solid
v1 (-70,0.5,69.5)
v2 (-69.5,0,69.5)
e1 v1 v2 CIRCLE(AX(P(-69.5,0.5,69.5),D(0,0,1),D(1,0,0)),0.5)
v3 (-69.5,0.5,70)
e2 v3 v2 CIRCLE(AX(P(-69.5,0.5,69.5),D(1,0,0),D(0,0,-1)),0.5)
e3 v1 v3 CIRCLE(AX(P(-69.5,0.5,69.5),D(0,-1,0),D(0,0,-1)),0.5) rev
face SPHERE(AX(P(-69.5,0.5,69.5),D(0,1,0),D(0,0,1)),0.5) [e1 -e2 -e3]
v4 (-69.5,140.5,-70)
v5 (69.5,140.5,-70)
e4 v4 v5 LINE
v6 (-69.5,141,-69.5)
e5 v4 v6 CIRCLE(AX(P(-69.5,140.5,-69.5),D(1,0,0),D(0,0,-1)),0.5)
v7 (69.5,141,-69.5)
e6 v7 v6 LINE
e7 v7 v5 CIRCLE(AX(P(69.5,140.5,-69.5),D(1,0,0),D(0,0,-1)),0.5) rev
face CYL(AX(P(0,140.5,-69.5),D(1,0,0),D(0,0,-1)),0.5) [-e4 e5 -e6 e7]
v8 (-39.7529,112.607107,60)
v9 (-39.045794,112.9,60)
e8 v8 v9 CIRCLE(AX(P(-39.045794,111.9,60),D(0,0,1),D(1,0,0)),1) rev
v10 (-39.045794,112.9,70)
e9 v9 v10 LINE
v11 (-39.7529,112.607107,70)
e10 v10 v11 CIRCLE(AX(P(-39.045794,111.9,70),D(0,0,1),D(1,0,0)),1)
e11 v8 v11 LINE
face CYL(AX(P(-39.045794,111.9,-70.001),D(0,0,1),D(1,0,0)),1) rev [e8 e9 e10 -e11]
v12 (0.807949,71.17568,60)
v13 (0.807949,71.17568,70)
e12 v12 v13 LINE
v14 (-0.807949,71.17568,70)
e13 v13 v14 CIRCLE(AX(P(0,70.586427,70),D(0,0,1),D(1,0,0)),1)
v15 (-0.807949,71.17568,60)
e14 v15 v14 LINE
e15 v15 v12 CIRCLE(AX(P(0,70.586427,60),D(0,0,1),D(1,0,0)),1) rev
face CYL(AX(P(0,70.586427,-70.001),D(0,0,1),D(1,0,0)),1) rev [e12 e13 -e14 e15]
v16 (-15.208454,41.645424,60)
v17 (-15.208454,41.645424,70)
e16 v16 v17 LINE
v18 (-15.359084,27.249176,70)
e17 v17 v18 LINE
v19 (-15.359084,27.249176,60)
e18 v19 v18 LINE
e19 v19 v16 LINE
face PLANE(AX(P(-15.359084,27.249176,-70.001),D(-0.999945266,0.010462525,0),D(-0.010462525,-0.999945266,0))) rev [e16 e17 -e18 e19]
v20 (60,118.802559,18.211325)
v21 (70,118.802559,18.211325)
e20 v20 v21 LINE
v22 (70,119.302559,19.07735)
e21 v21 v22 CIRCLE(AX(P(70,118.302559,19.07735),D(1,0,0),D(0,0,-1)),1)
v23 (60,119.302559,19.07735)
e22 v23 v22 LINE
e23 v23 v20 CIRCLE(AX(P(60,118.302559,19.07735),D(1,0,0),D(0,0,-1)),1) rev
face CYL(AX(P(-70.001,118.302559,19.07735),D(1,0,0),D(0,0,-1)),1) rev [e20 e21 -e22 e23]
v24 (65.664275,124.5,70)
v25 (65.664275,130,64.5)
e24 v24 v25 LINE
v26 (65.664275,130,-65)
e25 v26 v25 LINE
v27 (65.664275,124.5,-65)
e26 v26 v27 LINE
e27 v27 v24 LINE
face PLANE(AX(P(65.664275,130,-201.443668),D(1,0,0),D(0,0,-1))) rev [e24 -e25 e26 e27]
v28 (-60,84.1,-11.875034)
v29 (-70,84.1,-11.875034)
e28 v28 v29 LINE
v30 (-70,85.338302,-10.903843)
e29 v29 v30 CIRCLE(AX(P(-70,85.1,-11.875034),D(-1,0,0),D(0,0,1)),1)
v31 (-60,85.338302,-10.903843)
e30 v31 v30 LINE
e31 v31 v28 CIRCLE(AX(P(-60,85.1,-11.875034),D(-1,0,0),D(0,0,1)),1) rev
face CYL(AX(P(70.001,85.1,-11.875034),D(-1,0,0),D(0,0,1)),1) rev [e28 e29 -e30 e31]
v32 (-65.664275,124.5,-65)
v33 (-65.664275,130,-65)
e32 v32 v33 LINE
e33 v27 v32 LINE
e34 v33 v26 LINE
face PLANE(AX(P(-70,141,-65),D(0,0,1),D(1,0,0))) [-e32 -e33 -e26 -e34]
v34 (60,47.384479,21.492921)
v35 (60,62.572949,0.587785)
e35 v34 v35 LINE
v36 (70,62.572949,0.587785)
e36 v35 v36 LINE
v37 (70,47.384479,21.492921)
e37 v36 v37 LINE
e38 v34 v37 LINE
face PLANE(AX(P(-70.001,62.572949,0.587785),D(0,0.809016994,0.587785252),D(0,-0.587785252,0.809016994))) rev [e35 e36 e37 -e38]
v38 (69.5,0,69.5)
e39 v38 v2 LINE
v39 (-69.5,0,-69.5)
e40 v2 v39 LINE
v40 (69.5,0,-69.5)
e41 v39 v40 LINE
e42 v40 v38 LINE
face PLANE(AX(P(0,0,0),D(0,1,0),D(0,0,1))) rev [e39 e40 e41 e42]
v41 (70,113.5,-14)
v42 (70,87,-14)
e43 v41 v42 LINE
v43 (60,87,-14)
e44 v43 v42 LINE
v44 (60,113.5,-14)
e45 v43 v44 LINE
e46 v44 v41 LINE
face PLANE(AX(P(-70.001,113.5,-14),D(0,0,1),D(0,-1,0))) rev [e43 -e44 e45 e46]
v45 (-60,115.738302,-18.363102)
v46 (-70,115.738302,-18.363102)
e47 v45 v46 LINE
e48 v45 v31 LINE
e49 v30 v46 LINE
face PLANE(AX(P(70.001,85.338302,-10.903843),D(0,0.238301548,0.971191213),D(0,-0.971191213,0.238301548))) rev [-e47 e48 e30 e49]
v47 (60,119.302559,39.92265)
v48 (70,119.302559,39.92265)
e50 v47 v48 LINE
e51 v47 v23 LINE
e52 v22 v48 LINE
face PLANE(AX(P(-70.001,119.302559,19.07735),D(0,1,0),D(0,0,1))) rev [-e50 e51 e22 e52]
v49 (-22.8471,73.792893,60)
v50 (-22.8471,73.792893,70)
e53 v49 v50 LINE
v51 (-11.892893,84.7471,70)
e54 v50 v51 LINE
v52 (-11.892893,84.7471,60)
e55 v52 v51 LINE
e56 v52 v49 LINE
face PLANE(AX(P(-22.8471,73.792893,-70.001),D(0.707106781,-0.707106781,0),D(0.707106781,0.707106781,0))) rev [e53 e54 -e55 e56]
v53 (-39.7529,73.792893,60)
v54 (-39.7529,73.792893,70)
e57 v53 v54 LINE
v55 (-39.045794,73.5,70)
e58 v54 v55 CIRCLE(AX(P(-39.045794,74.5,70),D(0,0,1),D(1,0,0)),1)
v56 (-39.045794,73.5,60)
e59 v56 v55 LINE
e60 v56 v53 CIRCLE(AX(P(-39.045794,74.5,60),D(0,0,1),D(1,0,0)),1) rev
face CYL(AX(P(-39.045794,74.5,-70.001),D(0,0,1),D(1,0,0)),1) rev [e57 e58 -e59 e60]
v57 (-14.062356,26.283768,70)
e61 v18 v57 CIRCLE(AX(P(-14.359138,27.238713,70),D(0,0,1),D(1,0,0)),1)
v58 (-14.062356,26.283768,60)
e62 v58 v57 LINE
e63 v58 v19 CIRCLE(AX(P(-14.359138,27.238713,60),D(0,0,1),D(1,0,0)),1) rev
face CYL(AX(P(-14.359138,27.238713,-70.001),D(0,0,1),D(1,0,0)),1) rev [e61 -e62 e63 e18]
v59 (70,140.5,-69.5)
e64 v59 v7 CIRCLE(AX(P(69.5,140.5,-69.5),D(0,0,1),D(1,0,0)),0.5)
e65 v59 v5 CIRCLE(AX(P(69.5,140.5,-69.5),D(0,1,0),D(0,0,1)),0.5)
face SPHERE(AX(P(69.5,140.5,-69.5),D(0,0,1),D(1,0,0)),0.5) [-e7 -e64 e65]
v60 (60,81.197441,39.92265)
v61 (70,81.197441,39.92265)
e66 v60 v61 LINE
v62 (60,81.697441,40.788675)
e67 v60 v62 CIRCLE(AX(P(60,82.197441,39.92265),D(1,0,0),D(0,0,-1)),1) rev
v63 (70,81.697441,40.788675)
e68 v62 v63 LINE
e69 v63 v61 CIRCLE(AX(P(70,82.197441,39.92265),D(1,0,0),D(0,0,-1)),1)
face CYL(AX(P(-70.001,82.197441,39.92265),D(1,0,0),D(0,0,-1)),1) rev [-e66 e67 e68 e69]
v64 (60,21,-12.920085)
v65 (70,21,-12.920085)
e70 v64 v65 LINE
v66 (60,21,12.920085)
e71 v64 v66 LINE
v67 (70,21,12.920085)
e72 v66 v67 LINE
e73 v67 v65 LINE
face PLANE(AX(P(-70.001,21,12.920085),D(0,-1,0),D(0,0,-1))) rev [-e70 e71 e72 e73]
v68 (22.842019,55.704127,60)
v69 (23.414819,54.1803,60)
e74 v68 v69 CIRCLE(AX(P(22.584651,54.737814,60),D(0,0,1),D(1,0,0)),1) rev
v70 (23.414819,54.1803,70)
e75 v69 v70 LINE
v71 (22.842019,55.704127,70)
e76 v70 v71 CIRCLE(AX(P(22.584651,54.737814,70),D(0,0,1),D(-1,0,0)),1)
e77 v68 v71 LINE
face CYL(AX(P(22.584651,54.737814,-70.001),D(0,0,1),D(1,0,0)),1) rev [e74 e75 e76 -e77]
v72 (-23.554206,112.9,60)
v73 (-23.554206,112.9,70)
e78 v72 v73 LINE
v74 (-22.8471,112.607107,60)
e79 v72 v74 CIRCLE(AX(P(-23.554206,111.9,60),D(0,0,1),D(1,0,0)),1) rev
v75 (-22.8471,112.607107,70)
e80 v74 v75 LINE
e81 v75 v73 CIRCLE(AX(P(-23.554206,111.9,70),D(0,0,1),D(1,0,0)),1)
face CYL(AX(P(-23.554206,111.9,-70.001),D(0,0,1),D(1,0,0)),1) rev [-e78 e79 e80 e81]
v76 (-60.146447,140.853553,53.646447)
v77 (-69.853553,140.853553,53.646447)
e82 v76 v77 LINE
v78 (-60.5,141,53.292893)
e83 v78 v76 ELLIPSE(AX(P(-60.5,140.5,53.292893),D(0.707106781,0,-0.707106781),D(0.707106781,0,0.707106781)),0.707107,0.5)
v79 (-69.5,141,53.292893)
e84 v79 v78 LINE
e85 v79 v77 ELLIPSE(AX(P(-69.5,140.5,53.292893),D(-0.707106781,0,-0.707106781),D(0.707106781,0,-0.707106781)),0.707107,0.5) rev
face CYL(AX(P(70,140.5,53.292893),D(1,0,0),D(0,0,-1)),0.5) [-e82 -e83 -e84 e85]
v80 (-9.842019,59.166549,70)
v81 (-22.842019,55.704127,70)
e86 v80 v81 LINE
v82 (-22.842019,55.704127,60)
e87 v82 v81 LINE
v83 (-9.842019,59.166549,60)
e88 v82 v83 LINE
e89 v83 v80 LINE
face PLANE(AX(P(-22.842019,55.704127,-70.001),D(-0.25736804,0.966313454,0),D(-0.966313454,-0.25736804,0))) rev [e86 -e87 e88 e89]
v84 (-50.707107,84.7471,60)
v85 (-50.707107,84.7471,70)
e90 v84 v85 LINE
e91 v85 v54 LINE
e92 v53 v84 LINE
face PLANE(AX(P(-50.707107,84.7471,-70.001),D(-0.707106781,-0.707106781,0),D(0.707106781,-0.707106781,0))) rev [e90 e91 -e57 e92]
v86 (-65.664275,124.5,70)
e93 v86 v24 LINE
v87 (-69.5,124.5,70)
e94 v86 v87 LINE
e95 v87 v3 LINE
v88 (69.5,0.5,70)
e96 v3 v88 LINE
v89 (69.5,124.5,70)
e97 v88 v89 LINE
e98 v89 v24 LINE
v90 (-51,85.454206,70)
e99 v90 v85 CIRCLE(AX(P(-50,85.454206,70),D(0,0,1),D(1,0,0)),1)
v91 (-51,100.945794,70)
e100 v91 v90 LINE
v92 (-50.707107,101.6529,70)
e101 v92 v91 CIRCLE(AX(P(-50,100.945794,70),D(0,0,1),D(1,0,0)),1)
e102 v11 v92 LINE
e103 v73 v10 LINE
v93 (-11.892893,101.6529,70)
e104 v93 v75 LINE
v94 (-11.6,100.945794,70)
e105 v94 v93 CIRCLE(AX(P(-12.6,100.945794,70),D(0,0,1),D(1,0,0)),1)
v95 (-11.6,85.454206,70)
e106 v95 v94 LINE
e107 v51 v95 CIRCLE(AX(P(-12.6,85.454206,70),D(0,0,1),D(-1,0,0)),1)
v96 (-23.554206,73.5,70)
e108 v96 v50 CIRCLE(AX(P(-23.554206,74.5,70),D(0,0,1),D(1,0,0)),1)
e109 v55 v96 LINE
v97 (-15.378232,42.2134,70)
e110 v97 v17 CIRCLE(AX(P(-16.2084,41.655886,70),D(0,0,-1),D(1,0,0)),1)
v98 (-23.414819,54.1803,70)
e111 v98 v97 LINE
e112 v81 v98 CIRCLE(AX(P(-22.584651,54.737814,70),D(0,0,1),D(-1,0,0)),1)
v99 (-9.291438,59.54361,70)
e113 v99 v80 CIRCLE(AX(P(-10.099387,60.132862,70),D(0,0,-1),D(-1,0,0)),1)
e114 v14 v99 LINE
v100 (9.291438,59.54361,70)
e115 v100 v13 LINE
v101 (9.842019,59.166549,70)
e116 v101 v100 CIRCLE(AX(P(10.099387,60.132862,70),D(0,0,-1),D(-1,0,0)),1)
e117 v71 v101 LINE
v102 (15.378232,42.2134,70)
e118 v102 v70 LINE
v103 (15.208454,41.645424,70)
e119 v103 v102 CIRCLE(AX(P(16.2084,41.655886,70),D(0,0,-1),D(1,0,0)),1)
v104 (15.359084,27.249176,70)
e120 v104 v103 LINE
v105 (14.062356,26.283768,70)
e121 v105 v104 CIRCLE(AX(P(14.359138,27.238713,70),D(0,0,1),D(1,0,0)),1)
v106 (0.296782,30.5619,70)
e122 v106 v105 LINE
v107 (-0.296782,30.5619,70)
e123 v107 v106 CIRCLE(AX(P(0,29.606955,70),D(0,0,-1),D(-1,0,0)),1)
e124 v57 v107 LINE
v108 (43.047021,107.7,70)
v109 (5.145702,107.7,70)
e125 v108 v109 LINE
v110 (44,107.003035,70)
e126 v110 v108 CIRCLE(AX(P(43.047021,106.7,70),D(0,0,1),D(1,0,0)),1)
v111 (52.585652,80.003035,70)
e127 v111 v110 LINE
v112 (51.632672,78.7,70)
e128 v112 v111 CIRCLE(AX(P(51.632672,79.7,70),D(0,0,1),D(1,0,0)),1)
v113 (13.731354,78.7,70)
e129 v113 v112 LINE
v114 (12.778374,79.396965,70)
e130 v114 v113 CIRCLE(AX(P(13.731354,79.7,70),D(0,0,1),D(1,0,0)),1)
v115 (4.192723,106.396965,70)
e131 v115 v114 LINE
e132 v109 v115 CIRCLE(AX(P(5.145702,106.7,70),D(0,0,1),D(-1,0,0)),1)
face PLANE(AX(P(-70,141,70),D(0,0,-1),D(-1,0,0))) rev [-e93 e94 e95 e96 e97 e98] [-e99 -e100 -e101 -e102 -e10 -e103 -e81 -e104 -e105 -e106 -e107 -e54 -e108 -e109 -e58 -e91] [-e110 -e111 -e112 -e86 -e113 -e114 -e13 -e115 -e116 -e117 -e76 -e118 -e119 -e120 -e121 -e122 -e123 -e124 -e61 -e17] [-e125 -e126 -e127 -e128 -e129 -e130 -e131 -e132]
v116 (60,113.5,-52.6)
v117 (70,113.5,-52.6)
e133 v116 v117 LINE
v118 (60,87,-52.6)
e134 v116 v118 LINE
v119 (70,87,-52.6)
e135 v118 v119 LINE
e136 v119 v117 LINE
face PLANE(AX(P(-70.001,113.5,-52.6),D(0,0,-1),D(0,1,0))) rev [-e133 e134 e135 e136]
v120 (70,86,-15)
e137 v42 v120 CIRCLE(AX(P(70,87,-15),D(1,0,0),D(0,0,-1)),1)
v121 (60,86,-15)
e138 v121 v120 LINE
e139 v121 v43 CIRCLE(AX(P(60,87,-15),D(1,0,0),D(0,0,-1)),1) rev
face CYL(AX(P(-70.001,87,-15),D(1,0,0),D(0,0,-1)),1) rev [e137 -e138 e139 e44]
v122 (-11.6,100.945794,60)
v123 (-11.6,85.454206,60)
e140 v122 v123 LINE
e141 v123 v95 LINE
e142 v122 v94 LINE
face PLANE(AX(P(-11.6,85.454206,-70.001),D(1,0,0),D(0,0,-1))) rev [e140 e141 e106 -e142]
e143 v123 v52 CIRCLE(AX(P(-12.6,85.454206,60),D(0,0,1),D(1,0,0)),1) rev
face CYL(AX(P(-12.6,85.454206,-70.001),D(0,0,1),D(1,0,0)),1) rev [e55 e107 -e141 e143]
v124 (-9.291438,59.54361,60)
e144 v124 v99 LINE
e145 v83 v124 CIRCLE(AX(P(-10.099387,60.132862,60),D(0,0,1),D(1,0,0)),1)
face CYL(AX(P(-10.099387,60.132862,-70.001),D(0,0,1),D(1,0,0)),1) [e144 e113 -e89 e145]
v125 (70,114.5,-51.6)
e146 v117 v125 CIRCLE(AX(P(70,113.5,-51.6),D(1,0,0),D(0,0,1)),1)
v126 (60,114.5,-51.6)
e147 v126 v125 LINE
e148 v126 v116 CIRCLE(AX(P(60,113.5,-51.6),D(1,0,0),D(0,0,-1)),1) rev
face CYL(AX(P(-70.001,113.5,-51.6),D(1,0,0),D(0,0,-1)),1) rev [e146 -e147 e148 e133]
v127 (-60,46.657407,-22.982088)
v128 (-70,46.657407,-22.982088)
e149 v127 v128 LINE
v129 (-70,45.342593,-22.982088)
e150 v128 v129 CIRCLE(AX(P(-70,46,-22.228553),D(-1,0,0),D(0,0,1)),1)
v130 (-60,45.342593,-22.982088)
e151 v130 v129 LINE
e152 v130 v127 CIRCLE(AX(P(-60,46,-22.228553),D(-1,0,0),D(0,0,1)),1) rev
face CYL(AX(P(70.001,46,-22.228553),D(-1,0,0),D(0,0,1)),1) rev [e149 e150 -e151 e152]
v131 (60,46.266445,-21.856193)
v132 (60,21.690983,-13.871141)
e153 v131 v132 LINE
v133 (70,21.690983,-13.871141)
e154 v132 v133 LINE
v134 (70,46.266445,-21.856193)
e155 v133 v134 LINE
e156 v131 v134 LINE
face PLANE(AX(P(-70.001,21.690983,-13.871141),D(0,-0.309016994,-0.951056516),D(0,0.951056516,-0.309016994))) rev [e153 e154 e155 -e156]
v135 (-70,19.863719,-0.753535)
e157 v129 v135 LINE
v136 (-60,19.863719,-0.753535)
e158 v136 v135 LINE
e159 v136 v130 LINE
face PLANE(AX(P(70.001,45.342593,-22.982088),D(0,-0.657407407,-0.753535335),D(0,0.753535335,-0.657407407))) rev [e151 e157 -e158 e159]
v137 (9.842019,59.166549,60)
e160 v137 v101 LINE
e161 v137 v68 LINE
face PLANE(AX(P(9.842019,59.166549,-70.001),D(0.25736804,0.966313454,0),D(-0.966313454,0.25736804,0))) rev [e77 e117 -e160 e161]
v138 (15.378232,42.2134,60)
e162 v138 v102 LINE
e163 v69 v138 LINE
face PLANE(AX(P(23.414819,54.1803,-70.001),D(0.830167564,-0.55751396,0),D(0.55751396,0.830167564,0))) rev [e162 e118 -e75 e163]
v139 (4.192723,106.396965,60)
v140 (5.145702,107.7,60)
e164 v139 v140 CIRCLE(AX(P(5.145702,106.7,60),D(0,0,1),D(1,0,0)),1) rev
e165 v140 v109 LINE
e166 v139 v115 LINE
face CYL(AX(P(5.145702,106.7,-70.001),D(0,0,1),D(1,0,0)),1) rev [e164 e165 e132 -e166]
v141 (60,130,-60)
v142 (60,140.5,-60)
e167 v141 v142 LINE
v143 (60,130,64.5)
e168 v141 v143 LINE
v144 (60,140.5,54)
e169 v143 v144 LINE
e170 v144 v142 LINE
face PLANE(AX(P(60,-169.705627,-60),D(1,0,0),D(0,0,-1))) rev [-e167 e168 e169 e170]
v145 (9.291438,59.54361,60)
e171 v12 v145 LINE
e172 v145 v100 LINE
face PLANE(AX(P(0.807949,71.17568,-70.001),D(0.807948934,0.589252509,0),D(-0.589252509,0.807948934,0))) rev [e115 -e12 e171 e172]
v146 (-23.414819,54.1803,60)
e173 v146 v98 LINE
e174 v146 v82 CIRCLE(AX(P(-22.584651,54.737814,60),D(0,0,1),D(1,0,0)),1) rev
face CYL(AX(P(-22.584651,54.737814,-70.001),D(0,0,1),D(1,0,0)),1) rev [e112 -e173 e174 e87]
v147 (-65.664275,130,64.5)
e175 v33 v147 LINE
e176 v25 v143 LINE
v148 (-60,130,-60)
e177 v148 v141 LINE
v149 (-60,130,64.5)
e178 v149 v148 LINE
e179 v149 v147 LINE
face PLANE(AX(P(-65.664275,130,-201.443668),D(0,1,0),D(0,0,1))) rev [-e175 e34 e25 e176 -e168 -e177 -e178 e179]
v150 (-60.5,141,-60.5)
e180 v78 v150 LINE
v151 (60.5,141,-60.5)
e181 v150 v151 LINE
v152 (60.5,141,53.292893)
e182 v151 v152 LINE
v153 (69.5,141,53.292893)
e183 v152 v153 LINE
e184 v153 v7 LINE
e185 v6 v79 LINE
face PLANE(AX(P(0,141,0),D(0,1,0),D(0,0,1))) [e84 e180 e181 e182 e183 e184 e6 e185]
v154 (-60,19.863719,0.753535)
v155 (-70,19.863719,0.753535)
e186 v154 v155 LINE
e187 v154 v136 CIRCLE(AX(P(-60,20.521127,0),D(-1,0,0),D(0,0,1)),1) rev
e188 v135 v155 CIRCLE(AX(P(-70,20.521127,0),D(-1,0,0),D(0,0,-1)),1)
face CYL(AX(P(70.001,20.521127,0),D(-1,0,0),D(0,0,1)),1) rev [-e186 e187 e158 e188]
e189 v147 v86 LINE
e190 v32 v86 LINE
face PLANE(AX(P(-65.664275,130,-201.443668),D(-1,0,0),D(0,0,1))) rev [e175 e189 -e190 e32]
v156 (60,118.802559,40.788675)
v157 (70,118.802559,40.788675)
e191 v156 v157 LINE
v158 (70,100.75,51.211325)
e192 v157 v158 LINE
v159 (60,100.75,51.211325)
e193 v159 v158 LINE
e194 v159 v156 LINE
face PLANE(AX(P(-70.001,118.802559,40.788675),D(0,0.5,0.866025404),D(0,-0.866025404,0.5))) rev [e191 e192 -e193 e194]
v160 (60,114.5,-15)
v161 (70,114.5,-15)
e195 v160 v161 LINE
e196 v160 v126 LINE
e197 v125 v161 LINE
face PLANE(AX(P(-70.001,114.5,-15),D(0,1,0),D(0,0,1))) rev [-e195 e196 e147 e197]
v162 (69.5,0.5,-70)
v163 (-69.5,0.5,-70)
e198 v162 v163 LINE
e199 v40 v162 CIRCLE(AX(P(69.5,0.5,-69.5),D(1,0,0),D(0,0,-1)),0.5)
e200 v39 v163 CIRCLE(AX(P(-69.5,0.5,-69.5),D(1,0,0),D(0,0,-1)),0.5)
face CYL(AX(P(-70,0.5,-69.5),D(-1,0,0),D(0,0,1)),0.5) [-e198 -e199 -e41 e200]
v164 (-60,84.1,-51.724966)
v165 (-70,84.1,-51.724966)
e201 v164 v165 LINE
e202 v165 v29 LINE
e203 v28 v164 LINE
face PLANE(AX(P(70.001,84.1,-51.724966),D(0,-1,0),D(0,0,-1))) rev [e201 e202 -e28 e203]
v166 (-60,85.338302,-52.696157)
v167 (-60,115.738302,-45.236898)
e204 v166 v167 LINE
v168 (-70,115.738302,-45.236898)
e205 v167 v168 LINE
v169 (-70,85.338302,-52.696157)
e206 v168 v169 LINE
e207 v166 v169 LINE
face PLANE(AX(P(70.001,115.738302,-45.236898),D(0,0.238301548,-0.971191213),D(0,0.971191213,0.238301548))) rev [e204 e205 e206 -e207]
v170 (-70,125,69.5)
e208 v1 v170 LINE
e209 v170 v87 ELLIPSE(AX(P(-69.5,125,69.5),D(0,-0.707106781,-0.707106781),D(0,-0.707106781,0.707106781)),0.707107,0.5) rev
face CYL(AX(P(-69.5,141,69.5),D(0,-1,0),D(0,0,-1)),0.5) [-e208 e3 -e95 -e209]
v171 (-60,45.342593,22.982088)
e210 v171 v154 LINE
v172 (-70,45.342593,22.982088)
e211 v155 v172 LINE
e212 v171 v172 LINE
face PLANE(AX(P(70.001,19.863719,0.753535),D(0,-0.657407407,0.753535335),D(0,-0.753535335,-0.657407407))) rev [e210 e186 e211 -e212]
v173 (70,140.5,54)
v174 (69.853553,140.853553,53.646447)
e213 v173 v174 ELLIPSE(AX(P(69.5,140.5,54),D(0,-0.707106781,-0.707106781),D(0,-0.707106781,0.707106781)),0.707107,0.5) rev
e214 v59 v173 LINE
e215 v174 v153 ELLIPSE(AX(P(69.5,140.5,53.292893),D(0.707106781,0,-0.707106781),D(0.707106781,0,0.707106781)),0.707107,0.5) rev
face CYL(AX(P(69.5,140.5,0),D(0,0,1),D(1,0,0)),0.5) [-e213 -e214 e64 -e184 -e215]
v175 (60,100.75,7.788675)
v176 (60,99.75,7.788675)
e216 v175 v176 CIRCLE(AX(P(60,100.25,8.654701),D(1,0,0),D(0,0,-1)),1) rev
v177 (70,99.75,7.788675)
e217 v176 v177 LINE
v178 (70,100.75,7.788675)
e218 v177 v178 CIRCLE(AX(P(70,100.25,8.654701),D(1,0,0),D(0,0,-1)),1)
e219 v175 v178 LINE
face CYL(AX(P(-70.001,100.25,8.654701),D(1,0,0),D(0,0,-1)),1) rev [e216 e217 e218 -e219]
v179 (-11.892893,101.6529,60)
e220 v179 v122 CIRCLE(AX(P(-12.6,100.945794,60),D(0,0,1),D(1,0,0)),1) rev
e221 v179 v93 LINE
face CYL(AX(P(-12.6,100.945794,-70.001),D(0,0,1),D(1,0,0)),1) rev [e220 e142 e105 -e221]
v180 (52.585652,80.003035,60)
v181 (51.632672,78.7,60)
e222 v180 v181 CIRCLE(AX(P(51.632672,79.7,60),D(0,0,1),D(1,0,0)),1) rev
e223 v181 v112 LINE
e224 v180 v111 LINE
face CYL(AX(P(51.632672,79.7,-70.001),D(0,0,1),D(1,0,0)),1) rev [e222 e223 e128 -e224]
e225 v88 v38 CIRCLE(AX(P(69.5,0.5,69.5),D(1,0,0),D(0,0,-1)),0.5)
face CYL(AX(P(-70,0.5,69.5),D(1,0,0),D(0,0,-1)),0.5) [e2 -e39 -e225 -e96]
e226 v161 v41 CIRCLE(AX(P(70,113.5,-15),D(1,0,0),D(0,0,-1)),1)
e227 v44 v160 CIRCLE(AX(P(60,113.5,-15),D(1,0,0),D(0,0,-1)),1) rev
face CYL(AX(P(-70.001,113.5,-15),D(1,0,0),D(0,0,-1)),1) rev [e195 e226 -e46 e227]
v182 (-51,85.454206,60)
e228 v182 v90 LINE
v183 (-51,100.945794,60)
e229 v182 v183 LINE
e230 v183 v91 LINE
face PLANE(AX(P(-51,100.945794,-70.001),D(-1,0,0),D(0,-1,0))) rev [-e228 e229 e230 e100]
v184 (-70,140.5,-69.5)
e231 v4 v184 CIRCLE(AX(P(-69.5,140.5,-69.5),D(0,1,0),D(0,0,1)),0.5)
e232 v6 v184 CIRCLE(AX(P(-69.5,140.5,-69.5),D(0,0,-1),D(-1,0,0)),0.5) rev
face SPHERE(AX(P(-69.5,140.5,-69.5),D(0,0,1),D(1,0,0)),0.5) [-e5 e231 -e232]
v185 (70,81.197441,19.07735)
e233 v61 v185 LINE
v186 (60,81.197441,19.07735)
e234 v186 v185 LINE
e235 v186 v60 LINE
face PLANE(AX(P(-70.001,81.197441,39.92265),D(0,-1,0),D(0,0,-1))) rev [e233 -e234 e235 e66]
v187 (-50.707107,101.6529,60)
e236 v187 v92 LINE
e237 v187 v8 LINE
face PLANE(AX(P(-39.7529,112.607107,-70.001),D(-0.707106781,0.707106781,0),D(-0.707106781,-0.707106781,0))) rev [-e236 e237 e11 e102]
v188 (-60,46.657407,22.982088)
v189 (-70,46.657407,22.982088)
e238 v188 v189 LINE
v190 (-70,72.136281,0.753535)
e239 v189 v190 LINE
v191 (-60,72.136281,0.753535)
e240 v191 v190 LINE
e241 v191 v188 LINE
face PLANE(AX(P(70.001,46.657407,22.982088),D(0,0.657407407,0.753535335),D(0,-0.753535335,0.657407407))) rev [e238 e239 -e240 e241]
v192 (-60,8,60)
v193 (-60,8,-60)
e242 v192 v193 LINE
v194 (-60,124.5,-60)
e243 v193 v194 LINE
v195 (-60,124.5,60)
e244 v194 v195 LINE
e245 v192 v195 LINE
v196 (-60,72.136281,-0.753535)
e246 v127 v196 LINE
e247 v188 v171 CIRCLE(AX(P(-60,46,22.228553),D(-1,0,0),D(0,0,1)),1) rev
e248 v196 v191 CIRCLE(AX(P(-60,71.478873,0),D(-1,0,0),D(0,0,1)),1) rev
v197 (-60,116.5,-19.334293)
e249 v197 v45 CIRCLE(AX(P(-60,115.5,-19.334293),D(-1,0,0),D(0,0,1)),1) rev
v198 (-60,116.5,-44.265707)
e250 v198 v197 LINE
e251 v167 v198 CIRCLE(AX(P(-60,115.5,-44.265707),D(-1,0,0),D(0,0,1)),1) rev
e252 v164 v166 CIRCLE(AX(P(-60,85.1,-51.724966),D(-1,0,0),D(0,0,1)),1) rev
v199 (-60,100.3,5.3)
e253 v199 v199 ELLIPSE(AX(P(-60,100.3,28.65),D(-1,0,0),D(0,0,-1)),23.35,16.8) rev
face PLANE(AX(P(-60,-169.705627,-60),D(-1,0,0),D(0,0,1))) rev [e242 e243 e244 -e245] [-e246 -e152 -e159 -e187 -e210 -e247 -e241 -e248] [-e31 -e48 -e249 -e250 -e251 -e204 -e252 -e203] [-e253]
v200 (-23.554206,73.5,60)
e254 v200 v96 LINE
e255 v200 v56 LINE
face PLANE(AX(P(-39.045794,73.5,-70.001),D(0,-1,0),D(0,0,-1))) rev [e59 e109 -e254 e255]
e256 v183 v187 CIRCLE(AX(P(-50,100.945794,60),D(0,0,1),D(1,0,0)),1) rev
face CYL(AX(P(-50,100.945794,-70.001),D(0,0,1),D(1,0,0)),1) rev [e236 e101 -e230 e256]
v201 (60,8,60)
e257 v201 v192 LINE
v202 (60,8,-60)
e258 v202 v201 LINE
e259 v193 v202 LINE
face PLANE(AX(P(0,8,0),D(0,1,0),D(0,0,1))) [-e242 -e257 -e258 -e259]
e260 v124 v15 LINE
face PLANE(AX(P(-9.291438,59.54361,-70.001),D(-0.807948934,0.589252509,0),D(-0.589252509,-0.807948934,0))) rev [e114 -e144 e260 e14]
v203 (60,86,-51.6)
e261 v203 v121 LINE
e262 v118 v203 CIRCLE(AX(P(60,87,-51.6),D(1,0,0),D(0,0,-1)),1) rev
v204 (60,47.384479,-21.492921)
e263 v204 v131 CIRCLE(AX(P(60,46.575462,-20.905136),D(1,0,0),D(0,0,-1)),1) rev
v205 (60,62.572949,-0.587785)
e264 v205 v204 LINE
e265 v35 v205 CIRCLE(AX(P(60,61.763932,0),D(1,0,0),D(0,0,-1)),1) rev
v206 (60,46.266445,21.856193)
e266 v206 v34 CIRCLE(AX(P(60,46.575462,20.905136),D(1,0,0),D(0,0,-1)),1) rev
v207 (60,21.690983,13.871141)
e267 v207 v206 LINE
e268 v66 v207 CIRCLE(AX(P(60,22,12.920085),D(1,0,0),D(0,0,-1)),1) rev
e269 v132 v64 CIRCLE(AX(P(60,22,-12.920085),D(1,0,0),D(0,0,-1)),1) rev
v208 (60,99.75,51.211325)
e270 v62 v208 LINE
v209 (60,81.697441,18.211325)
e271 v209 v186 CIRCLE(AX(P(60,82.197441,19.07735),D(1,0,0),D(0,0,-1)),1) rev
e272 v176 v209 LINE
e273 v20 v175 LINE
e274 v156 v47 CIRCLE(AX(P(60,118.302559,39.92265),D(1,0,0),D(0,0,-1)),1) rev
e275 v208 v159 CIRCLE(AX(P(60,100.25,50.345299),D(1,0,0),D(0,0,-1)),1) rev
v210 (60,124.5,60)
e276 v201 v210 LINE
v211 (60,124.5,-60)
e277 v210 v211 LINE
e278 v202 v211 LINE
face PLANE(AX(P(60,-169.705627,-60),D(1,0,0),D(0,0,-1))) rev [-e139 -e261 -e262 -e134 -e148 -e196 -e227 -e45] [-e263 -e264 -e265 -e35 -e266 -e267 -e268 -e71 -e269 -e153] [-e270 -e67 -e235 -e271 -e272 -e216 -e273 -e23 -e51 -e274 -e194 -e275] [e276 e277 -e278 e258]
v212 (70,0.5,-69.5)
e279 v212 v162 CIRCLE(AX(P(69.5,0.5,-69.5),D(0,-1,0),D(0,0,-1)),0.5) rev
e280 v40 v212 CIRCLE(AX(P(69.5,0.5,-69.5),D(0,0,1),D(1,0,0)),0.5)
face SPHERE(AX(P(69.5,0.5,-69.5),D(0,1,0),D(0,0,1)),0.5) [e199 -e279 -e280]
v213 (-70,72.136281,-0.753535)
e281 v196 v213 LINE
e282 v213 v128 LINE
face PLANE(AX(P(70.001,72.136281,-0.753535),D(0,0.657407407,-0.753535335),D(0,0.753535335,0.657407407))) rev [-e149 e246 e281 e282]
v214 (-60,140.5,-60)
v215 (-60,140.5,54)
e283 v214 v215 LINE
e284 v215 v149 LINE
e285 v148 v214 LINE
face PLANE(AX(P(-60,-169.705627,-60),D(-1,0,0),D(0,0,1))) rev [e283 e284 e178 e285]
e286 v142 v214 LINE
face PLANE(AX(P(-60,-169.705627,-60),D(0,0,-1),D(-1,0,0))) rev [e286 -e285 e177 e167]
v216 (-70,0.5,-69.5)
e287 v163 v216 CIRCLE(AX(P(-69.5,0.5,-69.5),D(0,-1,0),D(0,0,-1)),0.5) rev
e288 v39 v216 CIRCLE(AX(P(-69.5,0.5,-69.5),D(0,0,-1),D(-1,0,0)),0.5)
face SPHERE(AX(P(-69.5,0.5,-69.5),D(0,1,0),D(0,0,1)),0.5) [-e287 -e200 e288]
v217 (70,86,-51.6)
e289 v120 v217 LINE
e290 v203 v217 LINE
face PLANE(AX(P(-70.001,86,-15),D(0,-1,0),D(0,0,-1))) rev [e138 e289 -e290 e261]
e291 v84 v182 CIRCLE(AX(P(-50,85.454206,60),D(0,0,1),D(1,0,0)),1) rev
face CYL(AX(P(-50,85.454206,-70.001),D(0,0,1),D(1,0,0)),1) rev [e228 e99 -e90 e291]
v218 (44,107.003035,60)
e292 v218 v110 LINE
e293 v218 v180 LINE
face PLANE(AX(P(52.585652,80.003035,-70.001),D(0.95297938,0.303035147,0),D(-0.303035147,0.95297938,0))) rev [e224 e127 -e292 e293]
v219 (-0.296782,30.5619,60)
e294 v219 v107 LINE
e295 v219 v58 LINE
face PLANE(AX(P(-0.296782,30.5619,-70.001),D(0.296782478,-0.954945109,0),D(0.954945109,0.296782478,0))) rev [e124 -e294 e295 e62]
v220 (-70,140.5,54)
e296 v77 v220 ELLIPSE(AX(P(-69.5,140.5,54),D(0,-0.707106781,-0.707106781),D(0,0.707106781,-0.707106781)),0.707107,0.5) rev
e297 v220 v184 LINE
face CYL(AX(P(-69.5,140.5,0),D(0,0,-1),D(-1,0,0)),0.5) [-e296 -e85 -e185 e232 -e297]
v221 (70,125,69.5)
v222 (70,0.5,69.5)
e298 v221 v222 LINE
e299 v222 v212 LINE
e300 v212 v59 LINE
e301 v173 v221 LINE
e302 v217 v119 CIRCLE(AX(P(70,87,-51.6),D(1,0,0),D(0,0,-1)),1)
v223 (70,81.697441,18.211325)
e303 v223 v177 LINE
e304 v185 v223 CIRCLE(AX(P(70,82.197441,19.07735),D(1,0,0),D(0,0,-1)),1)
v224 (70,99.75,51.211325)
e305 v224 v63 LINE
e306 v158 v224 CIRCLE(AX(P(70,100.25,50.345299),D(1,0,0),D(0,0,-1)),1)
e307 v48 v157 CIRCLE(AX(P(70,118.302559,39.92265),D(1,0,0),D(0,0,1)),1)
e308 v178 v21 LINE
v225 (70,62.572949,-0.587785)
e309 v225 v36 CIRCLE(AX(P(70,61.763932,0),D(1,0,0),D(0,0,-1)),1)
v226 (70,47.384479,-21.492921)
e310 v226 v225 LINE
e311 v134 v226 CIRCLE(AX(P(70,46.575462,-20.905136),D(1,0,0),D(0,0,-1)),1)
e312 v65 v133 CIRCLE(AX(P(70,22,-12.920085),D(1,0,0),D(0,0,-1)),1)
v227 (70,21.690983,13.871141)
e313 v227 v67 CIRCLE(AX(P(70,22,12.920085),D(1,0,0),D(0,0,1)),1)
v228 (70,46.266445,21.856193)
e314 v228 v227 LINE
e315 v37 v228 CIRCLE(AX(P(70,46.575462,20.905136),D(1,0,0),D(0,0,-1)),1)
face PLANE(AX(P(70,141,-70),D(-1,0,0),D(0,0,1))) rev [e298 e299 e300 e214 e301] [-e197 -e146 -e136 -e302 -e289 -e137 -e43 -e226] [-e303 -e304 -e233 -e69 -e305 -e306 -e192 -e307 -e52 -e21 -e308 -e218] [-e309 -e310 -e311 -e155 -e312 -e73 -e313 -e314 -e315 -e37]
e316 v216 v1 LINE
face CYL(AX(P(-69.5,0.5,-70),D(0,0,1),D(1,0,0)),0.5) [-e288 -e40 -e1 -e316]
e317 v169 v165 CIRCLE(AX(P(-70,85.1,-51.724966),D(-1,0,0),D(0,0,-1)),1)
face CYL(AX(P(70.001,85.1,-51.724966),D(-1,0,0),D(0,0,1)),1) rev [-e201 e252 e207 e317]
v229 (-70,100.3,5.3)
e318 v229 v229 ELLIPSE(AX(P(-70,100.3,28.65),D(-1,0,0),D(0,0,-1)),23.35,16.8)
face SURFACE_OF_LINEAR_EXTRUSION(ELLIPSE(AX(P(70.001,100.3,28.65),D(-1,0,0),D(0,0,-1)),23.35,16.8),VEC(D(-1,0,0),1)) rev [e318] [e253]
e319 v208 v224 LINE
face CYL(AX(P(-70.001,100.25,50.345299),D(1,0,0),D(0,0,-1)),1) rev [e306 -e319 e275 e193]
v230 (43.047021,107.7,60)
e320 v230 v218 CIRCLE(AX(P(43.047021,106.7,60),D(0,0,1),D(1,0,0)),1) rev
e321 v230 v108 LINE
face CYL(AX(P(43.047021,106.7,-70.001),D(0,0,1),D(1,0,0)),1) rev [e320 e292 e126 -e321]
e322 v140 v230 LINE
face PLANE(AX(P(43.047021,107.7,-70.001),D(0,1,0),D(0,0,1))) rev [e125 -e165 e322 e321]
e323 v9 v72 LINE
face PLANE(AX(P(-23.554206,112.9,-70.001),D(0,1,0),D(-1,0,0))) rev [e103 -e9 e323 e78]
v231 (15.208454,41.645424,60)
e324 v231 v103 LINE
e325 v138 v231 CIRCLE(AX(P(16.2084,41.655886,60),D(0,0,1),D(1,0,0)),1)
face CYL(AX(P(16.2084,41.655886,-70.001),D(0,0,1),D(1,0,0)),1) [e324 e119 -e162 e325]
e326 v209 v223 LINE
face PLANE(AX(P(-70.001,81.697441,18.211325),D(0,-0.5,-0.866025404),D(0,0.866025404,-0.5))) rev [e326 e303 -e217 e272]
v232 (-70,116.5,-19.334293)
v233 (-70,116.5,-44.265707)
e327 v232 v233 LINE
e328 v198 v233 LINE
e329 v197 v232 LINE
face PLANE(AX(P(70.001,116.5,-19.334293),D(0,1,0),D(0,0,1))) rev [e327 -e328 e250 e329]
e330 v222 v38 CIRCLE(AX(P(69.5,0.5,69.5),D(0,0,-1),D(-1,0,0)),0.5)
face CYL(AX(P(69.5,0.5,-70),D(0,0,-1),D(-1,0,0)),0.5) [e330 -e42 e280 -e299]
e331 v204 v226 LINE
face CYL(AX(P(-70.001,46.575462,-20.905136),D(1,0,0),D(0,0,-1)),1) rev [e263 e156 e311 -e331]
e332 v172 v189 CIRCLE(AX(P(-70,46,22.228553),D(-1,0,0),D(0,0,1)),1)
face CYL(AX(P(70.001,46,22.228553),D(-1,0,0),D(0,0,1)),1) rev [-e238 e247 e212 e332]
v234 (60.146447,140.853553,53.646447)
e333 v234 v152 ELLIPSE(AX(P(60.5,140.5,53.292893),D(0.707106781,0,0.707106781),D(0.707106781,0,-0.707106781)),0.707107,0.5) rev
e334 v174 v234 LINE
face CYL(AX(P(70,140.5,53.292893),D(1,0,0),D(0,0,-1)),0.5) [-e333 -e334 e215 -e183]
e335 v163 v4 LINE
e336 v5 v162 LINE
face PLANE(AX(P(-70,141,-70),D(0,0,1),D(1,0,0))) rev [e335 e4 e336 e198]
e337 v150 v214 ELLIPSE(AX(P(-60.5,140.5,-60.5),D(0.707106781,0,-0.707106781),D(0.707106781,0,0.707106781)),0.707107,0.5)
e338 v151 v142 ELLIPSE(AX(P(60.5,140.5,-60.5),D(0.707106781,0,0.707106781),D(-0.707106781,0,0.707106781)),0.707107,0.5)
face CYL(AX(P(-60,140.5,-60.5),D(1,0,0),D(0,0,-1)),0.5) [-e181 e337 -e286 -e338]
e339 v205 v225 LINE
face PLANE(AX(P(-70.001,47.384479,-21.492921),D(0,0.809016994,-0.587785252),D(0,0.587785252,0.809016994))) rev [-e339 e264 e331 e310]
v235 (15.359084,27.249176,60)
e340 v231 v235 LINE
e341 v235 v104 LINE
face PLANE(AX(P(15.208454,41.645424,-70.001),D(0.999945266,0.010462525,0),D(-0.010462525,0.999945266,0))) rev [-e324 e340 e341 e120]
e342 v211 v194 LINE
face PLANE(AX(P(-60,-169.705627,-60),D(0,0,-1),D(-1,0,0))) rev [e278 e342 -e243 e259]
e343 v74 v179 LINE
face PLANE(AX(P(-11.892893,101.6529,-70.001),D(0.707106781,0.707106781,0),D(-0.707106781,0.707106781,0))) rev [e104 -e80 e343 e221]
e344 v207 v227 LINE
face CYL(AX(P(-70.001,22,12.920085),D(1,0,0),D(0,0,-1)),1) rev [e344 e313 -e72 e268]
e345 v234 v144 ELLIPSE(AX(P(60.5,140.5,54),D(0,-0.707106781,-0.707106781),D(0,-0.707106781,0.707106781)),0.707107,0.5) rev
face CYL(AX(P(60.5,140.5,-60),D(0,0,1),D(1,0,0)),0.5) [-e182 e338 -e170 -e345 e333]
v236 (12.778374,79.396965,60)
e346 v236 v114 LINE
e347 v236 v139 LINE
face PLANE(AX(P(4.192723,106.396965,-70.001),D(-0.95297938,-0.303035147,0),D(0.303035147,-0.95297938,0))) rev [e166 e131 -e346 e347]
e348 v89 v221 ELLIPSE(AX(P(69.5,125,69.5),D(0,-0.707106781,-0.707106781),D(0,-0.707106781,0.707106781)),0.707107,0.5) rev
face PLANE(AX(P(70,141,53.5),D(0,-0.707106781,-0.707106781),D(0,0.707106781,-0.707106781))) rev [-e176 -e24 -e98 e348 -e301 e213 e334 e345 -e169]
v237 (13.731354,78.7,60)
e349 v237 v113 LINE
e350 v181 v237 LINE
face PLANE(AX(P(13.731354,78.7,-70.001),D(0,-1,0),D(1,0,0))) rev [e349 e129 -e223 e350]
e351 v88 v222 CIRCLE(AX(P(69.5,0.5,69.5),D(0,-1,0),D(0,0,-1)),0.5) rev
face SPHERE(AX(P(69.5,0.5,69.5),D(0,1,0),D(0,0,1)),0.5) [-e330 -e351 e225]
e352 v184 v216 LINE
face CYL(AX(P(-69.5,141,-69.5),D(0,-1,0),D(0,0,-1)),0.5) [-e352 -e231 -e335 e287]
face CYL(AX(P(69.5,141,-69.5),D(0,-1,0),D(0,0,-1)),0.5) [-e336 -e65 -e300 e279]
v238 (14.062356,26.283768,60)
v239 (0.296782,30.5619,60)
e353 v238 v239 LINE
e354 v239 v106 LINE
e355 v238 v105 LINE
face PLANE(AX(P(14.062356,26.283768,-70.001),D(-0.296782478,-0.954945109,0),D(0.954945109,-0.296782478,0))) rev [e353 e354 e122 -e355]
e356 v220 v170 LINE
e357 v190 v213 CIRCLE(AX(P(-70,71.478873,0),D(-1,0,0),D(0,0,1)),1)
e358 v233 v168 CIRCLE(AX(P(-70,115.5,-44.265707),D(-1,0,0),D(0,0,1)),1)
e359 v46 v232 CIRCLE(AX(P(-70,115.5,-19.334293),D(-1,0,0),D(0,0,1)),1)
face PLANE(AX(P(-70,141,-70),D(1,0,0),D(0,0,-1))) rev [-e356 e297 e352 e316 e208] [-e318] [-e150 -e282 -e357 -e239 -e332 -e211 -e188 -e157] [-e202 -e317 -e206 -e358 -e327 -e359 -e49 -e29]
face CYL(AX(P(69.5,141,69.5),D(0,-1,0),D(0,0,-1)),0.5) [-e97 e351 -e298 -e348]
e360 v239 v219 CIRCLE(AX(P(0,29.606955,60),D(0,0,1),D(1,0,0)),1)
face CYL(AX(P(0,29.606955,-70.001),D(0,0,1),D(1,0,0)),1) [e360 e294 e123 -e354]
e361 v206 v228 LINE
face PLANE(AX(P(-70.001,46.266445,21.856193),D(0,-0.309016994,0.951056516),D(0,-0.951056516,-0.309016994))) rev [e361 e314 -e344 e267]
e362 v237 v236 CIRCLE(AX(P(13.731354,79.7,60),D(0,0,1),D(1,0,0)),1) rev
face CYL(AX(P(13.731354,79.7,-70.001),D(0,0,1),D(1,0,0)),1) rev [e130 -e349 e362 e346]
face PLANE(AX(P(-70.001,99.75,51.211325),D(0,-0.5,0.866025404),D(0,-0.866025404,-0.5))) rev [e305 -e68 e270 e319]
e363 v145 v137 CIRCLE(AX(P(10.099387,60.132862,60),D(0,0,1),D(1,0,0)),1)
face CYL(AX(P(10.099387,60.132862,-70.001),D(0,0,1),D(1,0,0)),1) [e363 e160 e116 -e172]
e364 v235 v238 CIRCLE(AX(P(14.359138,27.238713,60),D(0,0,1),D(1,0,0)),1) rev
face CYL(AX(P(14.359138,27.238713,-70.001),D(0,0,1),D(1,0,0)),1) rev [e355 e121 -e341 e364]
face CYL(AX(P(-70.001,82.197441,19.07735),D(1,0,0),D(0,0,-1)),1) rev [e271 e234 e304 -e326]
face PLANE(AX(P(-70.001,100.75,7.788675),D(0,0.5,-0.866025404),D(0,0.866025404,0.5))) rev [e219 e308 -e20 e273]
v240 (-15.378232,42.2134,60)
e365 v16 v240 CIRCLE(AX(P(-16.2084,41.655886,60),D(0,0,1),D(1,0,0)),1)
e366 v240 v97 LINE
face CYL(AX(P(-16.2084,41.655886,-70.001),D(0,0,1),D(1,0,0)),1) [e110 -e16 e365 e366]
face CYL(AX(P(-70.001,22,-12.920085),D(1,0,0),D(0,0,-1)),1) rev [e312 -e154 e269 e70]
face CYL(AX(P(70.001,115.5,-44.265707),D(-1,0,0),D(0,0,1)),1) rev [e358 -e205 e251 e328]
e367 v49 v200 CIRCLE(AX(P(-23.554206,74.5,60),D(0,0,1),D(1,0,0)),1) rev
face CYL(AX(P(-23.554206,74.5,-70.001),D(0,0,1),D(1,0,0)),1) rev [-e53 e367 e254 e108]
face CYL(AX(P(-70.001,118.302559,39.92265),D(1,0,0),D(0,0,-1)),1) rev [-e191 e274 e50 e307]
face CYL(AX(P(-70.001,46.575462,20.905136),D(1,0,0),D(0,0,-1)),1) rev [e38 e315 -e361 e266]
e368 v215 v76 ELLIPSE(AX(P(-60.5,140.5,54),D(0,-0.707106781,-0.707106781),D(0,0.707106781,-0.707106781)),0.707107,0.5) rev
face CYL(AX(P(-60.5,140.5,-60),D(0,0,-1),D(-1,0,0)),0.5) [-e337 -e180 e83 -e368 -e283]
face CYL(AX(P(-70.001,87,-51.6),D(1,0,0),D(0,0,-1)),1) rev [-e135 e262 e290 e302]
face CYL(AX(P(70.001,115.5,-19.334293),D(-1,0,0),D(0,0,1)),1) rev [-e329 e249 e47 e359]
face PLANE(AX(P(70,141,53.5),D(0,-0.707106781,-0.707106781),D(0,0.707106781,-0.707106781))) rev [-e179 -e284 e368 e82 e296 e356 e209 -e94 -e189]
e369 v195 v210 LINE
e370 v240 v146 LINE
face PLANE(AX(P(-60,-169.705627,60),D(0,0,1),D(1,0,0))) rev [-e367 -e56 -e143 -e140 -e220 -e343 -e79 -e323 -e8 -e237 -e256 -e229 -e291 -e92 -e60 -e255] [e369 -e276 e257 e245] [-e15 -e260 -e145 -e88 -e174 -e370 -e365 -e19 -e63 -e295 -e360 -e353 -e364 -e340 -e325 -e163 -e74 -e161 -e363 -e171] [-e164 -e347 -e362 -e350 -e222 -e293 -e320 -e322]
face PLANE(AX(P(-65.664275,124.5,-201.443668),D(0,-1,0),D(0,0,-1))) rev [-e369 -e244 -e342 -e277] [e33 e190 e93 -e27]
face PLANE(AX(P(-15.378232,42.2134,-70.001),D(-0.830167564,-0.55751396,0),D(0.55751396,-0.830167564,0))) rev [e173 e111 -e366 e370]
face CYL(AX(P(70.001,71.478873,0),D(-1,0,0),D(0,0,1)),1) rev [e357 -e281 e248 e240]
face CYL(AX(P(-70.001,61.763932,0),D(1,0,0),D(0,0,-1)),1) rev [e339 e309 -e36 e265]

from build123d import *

# Parameters (mm, degrees)
SKETCH2_W           = 140
SKETCH2_H           = 140
BOSS_EXTRUDE1_DEPTH = 141
SKETCH3_W           = 120
SKETCH3_H           = 120
CUT_EXTRUDE1_DEPTH  = 133
SKETCH4_W           = 131.328549568
SKETCH4_H           = 5.5
CUT_EXTRUDE2_DEPTH  = 135
CUT_EXTRUDE3_DEPTH  = 211.667985228
CUT_EXTRUDE4_REACH  = 212.668
CUT_EXTRUDE5_REACH  = 212.668
SKETCH7_RX          = 23.35
SKETCH7_RY          = 16.8
CUT_EXTRUDE6_REACH  = 212.668
FILLET2_R           = 0.5
FILLET6_R           = 0.5
SKETCH10_W          = 120
SKETCH10_H          = 10.5
CUT_EXTRUDE7_DEPTH  = 131
FILLET7_R           = 0.5


with BuildPart() as part:
    # Sketch2 → Boss-Extrude1 (new body)
    with BuildSketch(Plane(origin=(0, 0, 0), x_dir=(1, 0, 0), z_dir=(0, 1, 0))):
        Rectangle(SKETCH2_W, SKETCH2_H)
    extrude(amount=BOSS_EXTRUDE1_DEPTH)

    # Sketch3 → Cut-Extrude1 (cut)
    with BuildSketch(Plane(origin=(0, 141, 0), x_dir=(1, 0, 0), z_dir=(0, 1, 0))):
        Rectangle(SKETCH3_W, SKETCH3_H)
    extrude(amount=-CUT_EXTRUDE1_DEPTH, mode=Mode.SUBTRACT)

    # Sketch4 → Cut-Extrude2 (cut)
    with BuildSketch(Plane.XY.offset(70)):
        with Locations((0, 127.25)):
            Rectangle(SKETCH4_W, SKETCH4_H)
    extrude(amount=-CUT_EXTRUDE2_DEPTH, mode=Mode.SUBTRACT)

    # Sketch5 → Cut-Extrude3 (cut, through all)
    with BuildSketch(Plane.ZY.offset(70)):
        Polygon((53.5, 141), (70, 124.5), (70, 141), align=None)
    extrude(amount=-CUT_EXTRUDE3_DEPTH, mode=Mode.SUBTRACT)

    # Sketch6 → Cut-Extrude4 (cut, up to next)
    with BuildSketch(Plane.XY.offset(70), mode=Mode.PRIVATE) as cut_extrude4_sk1:
        with BuildLine():
            Line((-11.6, 85.454206384), (-11.6, 100.945793616))
            ThreePointArc((-11.6, 100.945793616), (-11.676120467, 101.328477049), (-11.892893219, 101.652900398))
            Line((-11.892893219, 101.652900398), (-22.847099602, 112.607106781))
            ThreePointArc((-22.847099602, 112.607106781), (-23.171522951, 112.823879533), (-23.554206384, 112.9))
            Line((-23.554206384, 112.9), (-39.045793616, 112.9))
            ThreePointArc((-39.045793616, 112.9), (-39.428477049, 112.823879533), (-39.752900398, 112.607106781))
            Line((-39.752900398, 112.607106781), (-50.707106781, 101.652900398))
            ThreePointArc((-50.707106781, 101.652900398), (-50.923879533, 101.328477049), (-51, 100.945793616))
            Line((-51, 100.945793616), (-51, 85.454206384))
            ThreePointArc((-51, 85.454206384), (-50.923879533, 85.071522951), (-50.707106781, 84.747099602))
            Line((-50.707106781, 84.747099602), (-39.752900398, 73.792893219))
            ThreePointArc((-39.752900398, 73.792893219), (-39.428477049, 73.576120467), (-39.045793616, 73.5))
            Line((-39.045793616, 73.5), (-23.554206384, 73.5))
            ThreePointArc((-23.554206384, 73.5), (-23.171522951, 73.576120467), (-22.847099602, 73.792893219))
            Line((-22.847099602, 73.792893219), (-11.892893219, 84.747099602))
            ThreePointArc((-11.892893219, 84.747099602), (-11.676120467, 85.071522951), (-11.6, 85.454206384))
        make_face()
    cut_extrude4_tool1 = extrude(cut_extrude4_sk1.sketch, amount=-CUT_EXTRUDE4_REACH, mode=Mode.PRIVATE) & part.part
    # Sketch6 → Cut-Extrude4 (cut, up to next)
    with BuildSketch(Plane.XY.offset(70), mode=Mode.PRIVATE) as cut_extrude4_sk2:
        with BuildLine():
            Line((-15.359083662, 27.249175687), (-15.208454306, 41.645423645))
            ThreePointArc((-15.208454306, 41.645423645), (-15.250288115, 41.942281763), (-15.378232008, 42.213400131))
            Line((-15.378232008, 42.213400131), (-23.414818917, 54.180300077))
            ThreePointArc((-23.414818917, 54.180300077), (-23.520704727, 55.089672077), (-22.842019393, 55.704127491))
            Line((-22.842019393, 55.704127491), (-9.842019393, 59.166549034))
            ThreePointArc((-9.842019393, 59.166549034), (-9.53434867, 59.307798129), (-9.291438498, 59.543609979))
            Line((-9.291438498, 59.543609979), (-0.807948934, 71.175679843))
            ThreePointArc((-0.807948934, 71.175679843), (0, 71.586427333), (0.807948934, 71.175679843))
            Line((0.807948934, 71.175679843), (9.291438498, 59.543609979))
            ThreePointArc((9.291438498, 59.543609979), (9.53434867, 59.307798129), (9.842019393, 59.166549034))
            Line((9.842019393, 59.166549034), (22.842019393, 55.704127491))
            ThreePointArc((22.842019393, 55.704127491), (23.520704727, 55.089672077), (23.414818917, 54.180300077))
            Line((23.414818917, 54.180300077), (15.378232008, 42.213400131))
            ThreePointArc((15.378232008, 42.213400131), (15.250288115, 41.942281763), (15.208454306, 41.645423645))
            Line((15.208454306, 41.645423645), (15.359083662, 27.249175687))
            ThreePointArc((15.359083662, 27.249175687), (14.956308766, 26.436598738), (14.062355917, 26.283768052))
            Line((14.062355917, 26.283768052), (0.296782478, 30.561899811))
            ThreePointArc((0.296782478, 30.561899811), (0, 30.606954703), (-0.296782478, 30.561899811))
            Line((-0.296782478, 30.561899811), (-14.062355917, 26.283768052))
            ThreePointArc((-14.062355917, 26.283768052), (-14.956308766, 26.436598738), (-15.359083662, 27.249175687))
        make_face()
    cut_extrude4_tool2 = extrude(cut_extrude4_sk2.sketch, amount=-CUT_EXTRUDE4_REACH, mode=Mode.PRIVATE) & part.part
    # Sketch6 → Cut-Extrude4 (cut, up to next)
    with BuildSketch(Plane.XY.offset(70), mode=Mode.PRIVATE) as cut_extrude4_sk3:
        with BuildLine():
            Line((4.192722534, 106.396964853), (12.778374169, 79.396964853))
            ThreePointArc((12.778374169, 79.396964853), (13.141029549, 78.892833615), (13.73135355, 78.7))
            Line((13.73135355, 78.7), (51.632672255, 78.7))
            ThreePointArc((51.632672255, 78.7), (52.43983864, 79.109675999), (52.585651635, 80.003035147))
            Line((52.585651635, 80.003035147), (44, 107.003035147))
            ThreePointArc((44, 107.003035147), (43.637344621, 107.507166385), (43.04702062, 107.7))
            Line((43.04702062, 107.7), (5.145701914, 107.7))
            ThreePointArc((5.145701914, 107.7), (4.338535529, 107.290324001), (4.192722534, 106.396964853))
        make_face()
    cut_extrude4_tool3 = extrude(cut_extrude4_sk3.sketch, amount=-CUT_EXTRUDE4_REACH, mode=Mode.PRIVATE) & part.part
    add(cut_extrude4_tool1.solids().sort_by_distance((-31.3, 93.2, 70))[0], mode=Mode.SUBTRACT)
    add(cut_extrude4_tool2.solids().sort_by_distance((0, 46.589707, 70))[0], mode=Mode.SUBTRACT)
    add(cut_extrude4_tool3.solids().sort_by_distance((28.389187, 93.2, 70))[0], mode=Mode.SUBTRACT)

    # Sketch7 → Cut-Extrude5 (cut, up to next)
    with BuildSketch(Plane.ZY.offset(70), mode=Mode.PRIVATE) as cut_extrude5_sk1:
        with Locations(Location((28.65, 100.3), (0, 0, 180))):
            Ellipse(SKETCH7_RX, SKETCH7_RY)
    cut_extrude5_tool1 = extrude(cut_extrude5_sk1.sketch, amount=-CUT_EXTRUDE5_REACH, mode=Mode.PRIVATE) & part.part
    # Sketch7 → Cut-Extrude5 (cut, up to next)
    with BuildSketch(Plane.ZY.offset(70), mode=Mode.PRIVATE) as cut_extrude5_sk2:
        with BuildLine():
            Line((-51.724966278, 84.1), (-11.875033722, 84.1))
            ThreePointArc((-11.875033722, 84.1), (-11.088172379, 84.482870171), (-10.903842509, 85.338301548))
            Line((-10.903842509, 85.338301548), (-18.363101769, 115.738301548))
            ThreePointArc((-18.363101769, 115.738301548), (-18.717163152, 116.286861343), (-19.334292982, 116.5))
            Line((-19.334292982, 116.5), (-44.265707018, 116.5))
            ThreePointArc((-44.265707018, 116.5), (-44.882836848, 116.286861343), (-45.236898231, 115.738301548))
            Line((-45.236898231, 115.738301548), (-52.696157491, 85.338301548))
            ThreePointArc((-52.696157491, 85.338301548), (-52.511827621, 84.482870171), (-51.724966278, 84.1))
        make_face()
    cut_extrude5_tool2 = extrude(cut_extrude5_sk2.sketch, amount=-CUT_EXTRUDE5_REACH, mode=Mode.PRIVATE) & part.part
    # Sketch7 → Cut-Extrude5 (cut, up to next)
    with BuildSketch(Plane.ZY.offset(70), mode=Mode.PRIVATE) as cut_extrude5_sk3:
        with BuildLine():
            Line((0.753535335, 19.863719353), (22.982088168, 45.342592593))
            ThreePointArc((22.982088168, 45.342592593), (23.228552834, 46), (22.982088168, 46.657407407))
            Line((22.982088168, 46.657407407), (0.753535335, 72.136280647))
            ThreePointArc((0.753535335, 72.136280647), (0, 72.478873239), (-0.753535335, 72.136280647))
            Line((-0.753535335, 72.136280647), (-22.982088168, 46.657407407))
            ThreePointArc((-22.982088168, 46.657407407), (-23.228552834, 46), (-22.982088168, 45.342592593))
            Line((-22.982088168, 45.342592593), (-0.753535335, 19.863719353))
            ThreePointArc((-0.753535335, 19.863719353), (0, 19.521126761), (0.753535335, 19.863719353))
        make_face()
    cut_extrude5_tool3 = extrude(cut_extrude5_sk3.sketch, amount=-CUT_EXTRUDE5_REACH, mode=Mode.PRIVATE) & part.part
    add(cut_extrude5_tool1.solids().sort_by_distance((-70, 100.3, 28.65))[0], mode=Mode.SUBTRACT)
    add(cut_extrude5_tool2.solids().sort_by_distance((-70, 99.059866, -31.8))[0], mode=Mode.SUBTRACT)
    add(cut_extrude5_tool3.solids().sort_by_distance((-70, 46, 0))[0], mode=Mode.SUBTRACT)

    # Sketch9 → Cut-Extrude6 (cut, up to next)
    with BuildSketch(Plane(origin=(70, 0, 0), x_dir=(0, 0, -1), z_dir=(1, 0, 0)), mode=Mode.PRIVATE) as cut_extrude6_sk1:
        with BuildLine():
            Line((-12.920084714, 21), (12.920084714, 21))
            ThreePointArc((12.920084714, 21), (13.507869966, 21.190983006), (13.87114123, 21.690983006))
            Line((13.87114123, 21.690983006), (21.856192721, 46.266444522))
            ThreePointArc((21.856192721, 46.266444522), (21.856192721, 46.884478511), (21.492921457, 47.384478511))
            Line((21.492921457, 47.384478511), (0.587785252, 62.572949017))
            ThreePointArc((0.587785252, 62.572949017), (0, 62.763932023), (-0.587785252, 62.572949017))
            Line((-0.587785252, 62.572949017), (-21.492921457, 47.384478511))
            ThreePointArc((-21.492921457, 47.384478511), (-21.856192721, 46.884478511), (-21.856192721, 46.266444522))
            Line((-21.856192721, 46.266444522), (-13.87114123, 21.690983006))
            ThreePointArc((-13.87114123, 21.690983006), (-13.507869966, 21.190983006), (-12.920084714, 21))
        make_face()
    cut_extrude6_tool1 = extrude(cut_extrude6_sk1.sketch, amount=-CUT_EXTRUDE6_REACH, mode=Mode.PRIVATE) & part.part
    # Sketch9 → Cut-Extrude6 (cut, up to next)
    with BuildSketch(Plane(origin=(70, 0, 0), x_dir=(0, 0, -1), z_dir=(1, 0, 0)), mode=Mode.PRIVATE) as cut_extrude6_sk2:
        with BuildLine():
            Line((15, 114.5), (51.6, 114.5))
            ThreePointArc((51.6, 114.5), (52.307106781, 114.207106781), (52.6, 113.5))
            Line((52.6, 113.5), (52.6, 87))
            ThreePointArc((52.6, 87), (52.307106781, 86.292893219), (51.6, 86))
            Line((51.6, 86), (15, 86))
            ThreePointArc((15, 86), (14.292893219, 86.292893219), (14, 87))
            Line((14, 87), (14, 113.5))
            ThreePointArc((14, 113.5), (14.292893219, 114.207106781), (15, 114.5))
        make_face()
    cut_extrude6_tool2 = extrude(cut_extrude6_sk2.sketch, amount=-CUT_EXTRUDE6_REACH, mode=Mode.PRIVATE) & part.part
    # Sketch9 → Cut-Extrude6 (cut, up to next)
    with BuildSketch(Plane(origin=(70, 0, 0), x_dir=(0, 0, -1), z_dir=(1, 0, 0)), mode=Mode.PRIVATE) as cut_extrude6_sk3:
        with BuildLine():
            Line((-40.788675135, 118.802558883), (-51.211324865, 100.75))
            ThreePointArc((-51.211324865, 100.75), (-51.345299462, 100.25), (-51.211324865, 99.75))
            Line((-51.211324865, 99.75), (-40.788675135, 81.697441117))
            ThreePointArc((-40.788675135, 81.697441117), (-40.422649731, 81.331415713), (-39.922649731, 81.197441117))
            Line((-39.922649731, 81.197441117), (-19.077350269, 81.197441117))
            ThreePointArc((-19.077350269, 81.197441117), (-18.577350269, 81.331415713), (-18.211324865, 81.697441117))
            Line((-18.211324865, 81.697441117), (-7.788675135, 99.75))
            ThreePointArc((-7.788675135, 99.75), (-7.654700538, 100.25), (-7.788675135, 100.75))
            Line((-7.788675135, 100.75), (-18.211324865, 118.802558883))
            ThreePointArc((-18.211324865, 118.802558883), (-18.577350269, 119.168584287), (-19.077350269, 119.302558883))
            Line((-19.077350269, 119.302558883), (-39.922649731, 119.302558883))
            ThreePointArc((-39.922649731, 119.302558883), (-40.422649731, 119.168584287), (-40.788675135, 118.802558883))
        make_face()
    cut_extrude6_tool3 = extrude(cut_extrude6_sk3.sketch, amount=-CUT_EXTRUDE6_REACH, mode=Mode.PRIVATE) & part.part
    add(cut_extrude6_tool1.solids().sort_by_distance((70, 39.782971, 0))[0], mode=Mode.SUBTRACT)
    add(cut_extrude6_tool2.solids().sort_by_distance((70, 100.25, -33.3))[0], mode=Mode.SUBTRACT)
    add(cut_extrude6_tool3.solids().sort_by_distance((70, 100.25, 29.5))[0], mode=Mode.SUBTRACT)

    # Fillet2
    fillet2_edges = [part.edges().sort_by_distance(p)[0] for p in [
        (0, 141, -70),
        (-60, 141, -3.25),
        (0, 141, -60),
        (-70, 141, -8.25),
        (60, 141, -3.25),
        (70, 141, -8.25),
        (-65, 141, 53.5),
        (65, 141, 53.5),
    ]]
    fillet(fillet2_edges, radius=FILLET2_R)

    # Fillet6
    # the kernel refuses this fillet: 0.5 mm, written as the material it takes off along each edge
    with BuildSketch(Plane(origin=(-69.5, 140.5, -69.5), x_dir=(-1, 0, 0), z_dir=(0, 0, -1))) as fillet6_piece_1_section:
        Polygon((0, 0), (FILLET6_R, 0), (FILLET6_R, FILLET6_R), (0, FILLET6_R), align=None)
    fillet6_piece_1 = extrude(amount=FILLET6_R, mode=Mode.PRIVATE)
    fillet6_piece_1 = fillet6_piece_1 - Plane(origin=(-69.5, 140.5, -69.5), x_dir=(0.7071067811865475, -0.7071067811865475, 0), z_dir=(0, 0, -1)) * Sphere(FILLET6_R, mode=Mode.PRIVATE)
    add(fillet6_piece_1, mode=Mode.SUBTRACT)
    with BuildSketch(Plane(origin=(69.5, 140.5, -69.5), x_dir=(1, 0, 0), z_dir=(0, 0, -1))) as fillet6_piece_2_section:
        Polygon((0, 0), (FILLET6_R, 0), (FILLET6_R, -FILLET6_R), (0, -FILLET6_R), align=None)
    fillet6_piece_2 = extrude(amount=FILLET6_R, mode=Mode.PRIVATE)
    fillet6_piece_2 = fillet6_piece_2 - Plane(origin=(69.5, 140.5, -69.5), x_dir=(-0.7071067811865475, -0.7071067811865475, 0), z_dir=(0, 0, -1)) * Sphere(FILLET6_R, mode=Mode.PRIVATE)
    add(fillet6_piece_2, mode=Mode.SUBTRACT)
    with BuildSketch(Plane(origin=(-70, -1.25, -70), x_dir=(1, 0, 0), z_dir=(0, 1, 0))) as fillet6_piece_3:
        with BuildLine():
            CenterArc((FILLET6_R, -FILLET6_R), FILLET6_R, 90, 90)
            Line((0, -FILLET6_R), (0, 0))
            Line((0, 0), (FILLET6_R, 0))
        make_face()
    extrude(amount=141.75, mode=Mode.SUBTRACT)
    with BuildSketch(Plane(origin=(70, -1.25, -70), x_dir=(-1, 0, 0), z_dir=(0, 1, 0))) as fillet6_piece_4:
        with BuildLine():
            CenterArc((FILLET6_R, FILLET6_R), FILLET6_R, 180, 90)
            Line((0, FILLET6_R), (0, 0))
            Line((0, 0), (FILLET6_R, 0))
        make_face()
    extrude(amount=141.75, mode=Mode.SUBTRACT)
    with BuildSketch(Plane(origin=(70, -1.25, 70), x_dir=(0, 0, -1), z_dir=(0, 1, 0))) as fillet6_piece_5:
        with BuildLine():
            CenterArc((FILLET6_R, FILLET6_R), FILLET6_R, 180, 90)
            Line((0, FILLET6_R), (0, 0))
            Line((0, 0), (FILLET6_R, 0))
        make_face()
    extrude(amount=127, mode=Mode.SUBTRACT)
    with BuildSketch(Plane(origin=(-70, -1.25, 70), x_dir=(0, 0, -1), z_dir=(0, 1, 0))) as fillet6_piece_6:
        with BuildLine():
            CenterArc((FILLET6_R, -FILLET6_R), FILLET6_R, 90, 90)
            Line((0, -FILLET6_R), (0, 0))
            Line((0, 0), (FILLET6_R, 0))
        make_face()
    extrude(amount=127, mode=Mode.SUBTRACT)

    # Sketch10 → Cut-Extrude7 (cut)
    with BuildSketch(Plane.XY.offset(-60)):
        with Locations((0, 135.25)):
            Rectangle(SKETCH10_W, SKETCH10_H)
    extrude(amount=CUT_EXTRUDE7_DEPTH, mode=Mode.SUBTRACT)

    # Fillet7
    fillet7_edges = [part.edges().sort_by_distance(p)[0] for p in [
        (0, 0, 70),
        (-70, 0, 0),
        (0, 0, -70),
        (70, 0, 0),
        (-69.853553391, 0, -69.853553391),
        (69.853553391, 0, -69.853553391),
        (69.853553391, 0, 69.853553391),
        (-69.853553391, 0, 69.853553391),
    ]]
    fillet(fillet7_edges, radius=FILLET7_R)


solid = part.part
